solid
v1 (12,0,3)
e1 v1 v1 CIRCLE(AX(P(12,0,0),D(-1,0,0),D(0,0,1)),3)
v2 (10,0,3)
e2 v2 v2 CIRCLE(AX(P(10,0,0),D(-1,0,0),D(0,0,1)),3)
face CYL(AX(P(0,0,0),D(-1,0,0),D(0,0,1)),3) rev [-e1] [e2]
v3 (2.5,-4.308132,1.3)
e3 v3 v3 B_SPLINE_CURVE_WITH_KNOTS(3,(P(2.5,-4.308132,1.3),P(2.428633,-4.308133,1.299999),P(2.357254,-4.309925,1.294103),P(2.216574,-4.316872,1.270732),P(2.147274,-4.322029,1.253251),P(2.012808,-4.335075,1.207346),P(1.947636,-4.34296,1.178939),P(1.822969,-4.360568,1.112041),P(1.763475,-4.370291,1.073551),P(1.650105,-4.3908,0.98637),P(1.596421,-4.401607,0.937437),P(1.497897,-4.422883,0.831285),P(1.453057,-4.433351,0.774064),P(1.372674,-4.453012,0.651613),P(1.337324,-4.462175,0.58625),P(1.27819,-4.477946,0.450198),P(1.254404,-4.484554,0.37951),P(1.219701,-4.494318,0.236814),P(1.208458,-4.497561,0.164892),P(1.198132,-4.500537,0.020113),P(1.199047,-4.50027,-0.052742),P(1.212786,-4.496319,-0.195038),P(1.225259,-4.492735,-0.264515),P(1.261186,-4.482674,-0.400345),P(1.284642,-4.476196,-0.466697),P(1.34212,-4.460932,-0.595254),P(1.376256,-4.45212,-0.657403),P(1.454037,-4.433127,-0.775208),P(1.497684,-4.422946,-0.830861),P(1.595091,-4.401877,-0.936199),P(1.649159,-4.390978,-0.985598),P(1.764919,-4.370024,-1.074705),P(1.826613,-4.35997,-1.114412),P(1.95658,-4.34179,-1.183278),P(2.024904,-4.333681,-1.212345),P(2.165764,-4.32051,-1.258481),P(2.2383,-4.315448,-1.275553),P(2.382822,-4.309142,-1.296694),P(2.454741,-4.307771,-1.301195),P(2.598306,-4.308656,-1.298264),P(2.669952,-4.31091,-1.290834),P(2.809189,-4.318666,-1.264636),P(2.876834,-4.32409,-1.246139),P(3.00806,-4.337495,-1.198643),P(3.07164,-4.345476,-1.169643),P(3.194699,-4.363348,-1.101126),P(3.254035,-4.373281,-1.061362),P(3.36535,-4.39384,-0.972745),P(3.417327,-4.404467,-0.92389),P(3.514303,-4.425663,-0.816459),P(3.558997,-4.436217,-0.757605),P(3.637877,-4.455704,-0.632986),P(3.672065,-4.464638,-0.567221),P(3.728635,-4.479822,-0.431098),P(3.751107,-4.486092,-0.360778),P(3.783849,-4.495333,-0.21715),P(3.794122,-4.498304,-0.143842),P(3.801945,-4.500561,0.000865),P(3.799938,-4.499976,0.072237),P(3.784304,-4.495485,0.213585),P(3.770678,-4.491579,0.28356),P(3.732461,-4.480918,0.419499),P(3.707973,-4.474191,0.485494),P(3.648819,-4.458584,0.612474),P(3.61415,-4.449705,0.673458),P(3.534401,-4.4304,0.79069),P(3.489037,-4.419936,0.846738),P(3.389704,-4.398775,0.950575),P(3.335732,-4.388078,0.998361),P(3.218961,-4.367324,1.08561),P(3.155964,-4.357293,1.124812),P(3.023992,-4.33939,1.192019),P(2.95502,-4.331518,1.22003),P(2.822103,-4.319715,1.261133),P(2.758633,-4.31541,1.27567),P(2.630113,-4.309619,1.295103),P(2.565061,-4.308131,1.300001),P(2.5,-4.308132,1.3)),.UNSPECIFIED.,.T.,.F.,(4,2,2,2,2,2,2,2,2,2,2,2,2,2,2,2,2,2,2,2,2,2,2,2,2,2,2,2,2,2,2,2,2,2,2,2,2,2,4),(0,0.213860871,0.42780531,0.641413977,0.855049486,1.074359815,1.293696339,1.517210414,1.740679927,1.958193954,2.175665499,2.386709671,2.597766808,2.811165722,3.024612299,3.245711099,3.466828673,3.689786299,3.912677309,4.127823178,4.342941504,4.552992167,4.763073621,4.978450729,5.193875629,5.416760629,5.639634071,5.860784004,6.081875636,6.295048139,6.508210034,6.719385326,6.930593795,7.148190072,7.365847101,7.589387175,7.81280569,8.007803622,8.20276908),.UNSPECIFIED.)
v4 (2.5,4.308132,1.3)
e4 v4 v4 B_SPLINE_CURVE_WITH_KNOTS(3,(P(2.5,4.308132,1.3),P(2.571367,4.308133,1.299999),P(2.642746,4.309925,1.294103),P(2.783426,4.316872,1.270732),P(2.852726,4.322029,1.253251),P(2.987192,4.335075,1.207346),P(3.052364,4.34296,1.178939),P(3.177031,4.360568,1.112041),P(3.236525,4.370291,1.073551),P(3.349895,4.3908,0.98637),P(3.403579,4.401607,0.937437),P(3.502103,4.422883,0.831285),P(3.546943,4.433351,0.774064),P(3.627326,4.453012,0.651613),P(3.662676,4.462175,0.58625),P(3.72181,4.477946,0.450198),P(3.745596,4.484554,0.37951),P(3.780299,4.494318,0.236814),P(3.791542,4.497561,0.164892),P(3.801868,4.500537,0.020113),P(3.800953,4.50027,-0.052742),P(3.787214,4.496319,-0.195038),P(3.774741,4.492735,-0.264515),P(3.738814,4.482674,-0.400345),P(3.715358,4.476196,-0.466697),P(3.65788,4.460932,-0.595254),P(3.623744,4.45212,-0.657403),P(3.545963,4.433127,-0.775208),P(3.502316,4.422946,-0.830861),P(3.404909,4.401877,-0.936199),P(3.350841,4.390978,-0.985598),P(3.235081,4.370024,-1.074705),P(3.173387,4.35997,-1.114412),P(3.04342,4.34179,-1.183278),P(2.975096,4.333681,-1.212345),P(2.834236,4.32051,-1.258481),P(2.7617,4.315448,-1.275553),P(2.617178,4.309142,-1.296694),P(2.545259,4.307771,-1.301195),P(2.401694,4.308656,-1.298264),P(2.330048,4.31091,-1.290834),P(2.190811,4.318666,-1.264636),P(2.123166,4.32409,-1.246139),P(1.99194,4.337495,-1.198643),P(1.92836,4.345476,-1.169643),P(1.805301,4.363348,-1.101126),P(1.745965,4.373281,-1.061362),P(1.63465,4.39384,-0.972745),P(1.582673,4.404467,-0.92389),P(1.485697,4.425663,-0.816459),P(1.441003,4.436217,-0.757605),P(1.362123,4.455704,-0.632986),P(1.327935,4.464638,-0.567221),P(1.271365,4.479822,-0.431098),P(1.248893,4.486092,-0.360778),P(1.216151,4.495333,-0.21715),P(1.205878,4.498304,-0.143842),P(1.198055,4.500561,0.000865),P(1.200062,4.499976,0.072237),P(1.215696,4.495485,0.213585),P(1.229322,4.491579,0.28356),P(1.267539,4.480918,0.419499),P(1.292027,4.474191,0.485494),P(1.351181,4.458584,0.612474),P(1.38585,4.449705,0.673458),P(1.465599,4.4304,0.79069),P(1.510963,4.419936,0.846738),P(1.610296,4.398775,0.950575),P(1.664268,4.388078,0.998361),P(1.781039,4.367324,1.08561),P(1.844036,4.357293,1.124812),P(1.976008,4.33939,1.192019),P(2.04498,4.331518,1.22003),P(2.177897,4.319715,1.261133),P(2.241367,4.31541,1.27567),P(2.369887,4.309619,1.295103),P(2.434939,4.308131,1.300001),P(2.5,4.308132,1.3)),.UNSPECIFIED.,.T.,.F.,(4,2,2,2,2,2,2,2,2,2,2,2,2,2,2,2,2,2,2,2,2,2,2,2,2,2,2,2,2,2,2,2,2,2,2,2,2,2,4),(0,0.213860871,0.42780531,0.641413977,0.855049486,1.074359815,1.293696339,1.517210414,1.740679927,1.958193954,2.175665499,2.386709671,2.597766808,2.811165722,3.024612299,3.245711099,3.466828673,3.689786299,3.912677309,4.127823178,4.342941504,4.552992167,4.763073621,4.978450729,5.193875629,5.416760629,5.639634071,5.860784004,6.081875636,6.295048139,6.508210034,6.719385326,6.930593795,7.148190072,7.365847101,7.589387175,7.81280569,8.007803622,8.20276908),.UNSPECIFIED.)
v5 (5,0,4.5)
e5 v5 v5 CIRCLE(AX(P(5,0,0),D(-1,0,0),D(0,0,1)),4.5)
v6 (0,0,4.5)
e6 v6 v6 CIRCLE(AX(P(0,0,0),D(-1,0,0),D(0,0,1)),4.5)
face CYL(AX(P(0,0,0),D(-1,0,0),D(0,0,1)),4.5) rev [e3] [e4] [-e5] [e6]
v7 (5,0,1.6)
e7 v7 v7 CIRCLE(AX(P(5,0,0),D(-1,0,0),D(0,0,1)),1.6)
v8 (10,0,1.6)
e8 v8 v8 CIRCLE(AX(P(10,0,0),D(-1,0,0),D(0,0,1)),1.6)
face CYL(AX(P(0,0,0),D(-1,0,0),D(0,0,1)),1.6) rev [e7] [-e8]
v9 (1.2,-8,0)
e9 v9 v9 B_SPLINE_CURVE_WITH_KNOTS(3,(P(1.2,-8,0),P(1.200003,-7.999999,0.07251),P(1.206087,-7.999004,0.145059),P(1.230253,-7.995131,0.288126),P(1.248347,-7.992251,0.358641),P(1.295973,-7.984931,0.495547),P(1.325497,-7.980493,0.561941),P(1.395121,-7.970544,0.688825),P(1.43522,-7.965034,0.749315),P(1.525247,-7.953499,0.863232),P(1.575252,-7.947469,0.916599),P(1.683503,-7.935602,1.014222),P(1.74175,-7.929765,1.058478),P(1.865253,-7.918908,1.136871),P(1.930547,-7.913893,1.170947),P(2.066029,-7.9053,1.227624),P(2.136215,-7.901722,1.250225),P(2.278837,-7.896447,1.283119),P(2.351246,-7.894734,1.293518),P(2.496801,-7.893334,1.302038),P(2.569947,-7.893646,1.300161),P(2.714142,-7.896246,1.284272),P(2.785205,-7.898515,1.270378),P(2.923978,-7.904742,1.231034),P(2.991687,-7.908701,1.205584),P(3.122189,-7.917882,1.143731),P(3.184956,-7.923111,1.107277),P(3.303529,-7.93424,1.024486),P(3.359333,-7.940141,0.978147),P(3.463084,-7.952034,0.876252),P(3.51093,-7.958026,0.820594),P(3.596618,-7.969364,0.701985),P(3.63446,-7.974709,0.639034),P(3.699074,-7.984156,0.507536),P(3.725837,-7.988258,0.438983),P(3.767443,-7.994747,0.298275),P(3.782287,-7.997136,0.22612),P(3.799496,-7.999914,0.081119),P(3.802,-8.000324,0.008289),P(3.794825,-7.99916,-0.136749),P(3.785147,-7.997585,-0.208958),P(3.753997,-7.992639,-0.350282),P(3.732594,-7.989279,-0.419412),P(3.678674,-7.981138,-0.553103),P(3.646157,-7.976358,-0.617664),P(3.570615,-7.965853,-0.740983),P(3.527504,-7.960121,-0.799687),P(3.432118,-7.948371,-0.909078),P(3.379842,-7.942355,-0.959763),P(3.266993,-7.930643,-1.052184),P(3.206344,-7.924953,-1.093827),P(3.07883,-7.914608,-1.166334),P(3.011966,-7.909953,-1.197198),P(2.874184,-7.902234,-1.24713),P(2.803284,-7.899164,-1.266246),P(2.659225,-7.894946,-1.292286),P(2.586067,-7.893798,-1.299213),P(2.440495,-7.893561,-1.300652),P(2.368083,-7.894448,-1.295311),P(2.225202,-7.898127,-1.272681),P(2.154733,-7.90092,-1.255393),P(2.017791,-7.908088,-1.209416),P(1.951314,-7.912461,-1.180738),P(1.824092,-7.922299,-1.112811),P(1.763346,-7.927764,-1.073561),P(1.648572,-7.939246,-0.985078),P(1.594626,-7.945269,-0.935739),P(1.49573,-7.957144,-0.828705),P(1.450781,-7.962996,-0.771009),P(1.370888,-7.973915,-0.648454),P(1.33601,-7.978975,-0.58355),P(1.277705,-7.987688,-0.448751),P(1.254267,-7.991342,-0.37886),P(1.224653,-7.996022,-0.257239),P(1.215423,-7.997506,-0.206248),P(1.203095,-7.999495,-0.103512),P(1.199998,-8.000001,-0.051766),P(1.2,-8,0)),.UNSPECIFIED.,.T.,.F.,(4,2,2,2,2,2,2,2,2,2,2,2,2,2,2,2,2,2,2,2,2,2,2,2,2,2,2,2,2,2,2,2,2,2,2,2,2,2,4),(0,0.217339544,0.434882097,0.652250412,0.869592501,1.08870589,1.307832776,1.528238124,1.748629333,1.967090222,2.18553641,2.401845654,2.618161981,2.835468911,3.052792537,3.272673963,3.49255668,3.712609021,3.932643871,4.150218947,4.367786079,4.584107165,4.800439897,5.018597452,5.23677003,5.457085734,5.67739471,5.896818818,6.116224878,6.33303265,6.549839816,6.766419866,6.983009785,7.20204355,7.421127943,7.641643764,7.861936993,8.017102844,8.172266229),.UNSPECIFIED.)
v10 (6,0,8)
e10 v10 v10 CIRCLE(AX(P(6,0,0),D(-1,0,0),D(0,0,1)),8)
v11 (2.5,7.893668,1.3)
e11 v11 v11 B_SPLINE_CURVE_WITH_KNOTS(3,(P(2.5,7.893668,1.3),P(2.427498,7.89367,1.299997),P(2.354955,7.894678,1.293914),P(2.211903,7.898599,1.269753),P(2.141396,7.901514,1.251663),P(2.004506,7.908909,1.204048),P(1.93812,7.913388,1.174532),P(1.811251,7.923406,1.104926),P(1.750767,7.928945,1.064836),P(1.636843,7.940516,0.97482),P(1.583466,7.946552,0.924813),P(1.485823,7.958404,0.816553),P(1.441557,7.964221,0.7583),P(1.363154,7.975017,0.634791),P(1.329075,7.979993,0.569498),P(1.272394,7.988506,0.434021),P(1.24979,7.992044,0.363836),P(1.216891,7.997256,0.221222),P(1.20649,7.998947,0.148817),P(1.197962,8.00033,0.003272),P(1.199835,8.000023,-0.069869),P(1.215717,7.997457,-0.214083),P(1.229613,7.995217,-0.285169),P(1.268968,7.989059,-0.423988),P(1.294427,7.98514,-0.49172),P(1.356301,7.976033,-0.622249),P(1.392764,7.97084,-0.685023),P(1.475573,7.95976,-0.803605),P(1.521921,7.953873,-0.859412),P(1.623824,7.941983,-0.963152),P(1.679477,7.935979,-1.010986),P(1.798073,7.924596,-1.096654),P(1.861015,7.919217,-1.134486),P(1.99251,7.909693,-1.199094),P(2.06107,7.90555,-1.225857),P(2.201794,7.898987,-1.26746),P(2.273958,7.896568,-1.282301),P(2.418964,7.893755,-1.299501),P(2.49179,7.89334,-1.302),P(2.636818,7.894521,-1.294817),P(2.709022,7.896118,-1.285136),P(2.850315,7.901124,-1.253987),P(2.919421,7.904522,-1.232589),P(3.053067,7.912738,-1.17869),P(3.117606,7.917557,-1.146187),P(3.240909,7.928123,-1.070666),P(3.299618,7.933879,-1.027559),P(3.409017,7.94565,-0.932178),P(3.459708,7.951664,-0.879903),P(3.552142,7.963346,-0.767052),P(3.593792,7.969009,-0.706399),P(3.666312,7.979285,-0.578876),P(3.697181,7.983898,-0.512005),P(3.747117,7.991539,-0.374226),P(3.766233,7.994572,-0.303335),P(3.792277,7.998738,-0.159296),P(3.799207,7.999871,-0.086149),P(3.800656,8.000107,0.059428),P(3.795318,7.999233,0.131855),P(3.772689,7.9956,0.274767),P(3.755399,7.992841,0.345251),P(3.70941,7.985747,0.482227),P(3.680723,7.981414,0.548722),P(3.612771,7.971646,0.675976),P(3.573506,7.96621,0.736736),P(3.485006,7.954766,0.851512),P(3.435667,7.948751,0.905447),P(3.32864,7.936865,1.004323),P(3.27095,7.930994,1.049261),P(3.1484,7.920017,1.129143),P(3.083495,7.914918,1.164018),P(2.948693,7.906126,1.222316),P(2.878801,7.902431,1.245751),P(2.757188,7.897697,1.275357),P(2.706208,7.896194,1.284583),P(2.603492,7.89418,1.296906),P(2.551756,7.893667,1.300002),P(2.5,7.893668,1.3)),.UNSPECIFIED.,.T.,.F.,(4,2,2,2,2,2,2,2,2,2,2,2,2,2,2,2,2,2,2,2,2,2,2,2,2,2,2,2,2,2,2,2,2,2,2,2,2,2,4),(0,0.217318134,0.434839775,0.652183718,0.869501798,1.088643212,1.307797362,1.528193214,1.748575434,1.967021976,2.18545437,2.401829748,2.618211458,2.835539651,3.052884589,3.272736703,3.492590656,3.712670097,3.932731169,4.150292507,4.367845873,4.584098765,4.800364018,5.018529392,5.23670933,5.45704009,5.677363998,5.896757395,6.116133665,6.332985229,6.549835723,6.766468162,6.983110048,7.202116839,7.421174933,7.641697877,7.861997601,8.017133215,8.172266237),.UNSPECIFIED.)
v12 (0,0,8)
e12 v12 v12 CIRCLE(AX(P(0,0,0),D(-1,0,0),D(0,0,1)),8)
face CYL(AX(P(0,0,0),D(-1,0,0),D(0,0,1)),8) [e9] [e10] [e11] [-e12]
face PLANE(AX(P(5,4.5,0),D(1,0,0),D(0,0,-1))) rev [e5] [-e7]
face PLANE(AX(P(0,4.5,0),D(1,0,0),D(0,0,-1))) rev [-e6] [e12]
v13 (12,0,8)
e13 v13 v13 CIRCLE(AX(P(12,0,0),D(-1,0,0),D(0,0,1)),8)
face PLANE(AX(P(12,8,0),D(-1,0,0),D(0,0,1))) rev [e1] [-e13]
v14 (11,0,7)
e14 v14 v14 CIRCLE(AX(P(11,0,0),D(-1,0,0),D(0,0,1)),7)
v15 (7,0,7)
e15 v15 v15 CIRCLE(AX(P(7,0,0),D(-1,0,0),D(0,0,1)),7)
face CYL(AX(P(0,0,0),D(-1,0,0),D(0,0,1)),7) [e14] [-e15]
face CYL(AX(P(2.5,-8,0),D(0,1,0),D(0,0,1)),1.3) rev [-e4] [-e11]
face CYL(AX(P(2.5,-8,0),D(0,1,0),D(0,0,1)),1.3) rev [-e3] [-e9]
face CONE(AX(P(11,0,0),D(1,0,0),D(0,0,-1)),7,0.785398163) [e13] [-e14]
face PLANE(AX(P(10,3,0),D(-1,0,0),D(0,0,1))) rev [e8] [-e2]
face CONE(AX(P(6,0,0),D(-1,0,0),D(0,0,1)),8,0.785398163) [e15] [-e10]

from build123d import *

# Parameters (mm, degrees)
CUT_EXTRUDE1_DEPTH      = 17.492422502
CUT_EXTRUDE1_DEPTH_BACK = 17.492422502
SKETCH2_R               = 1.3
CHAMFER1_SIZE           = 1


with BuildPart() as part:
    # Sketch1 → Revolve1 (revolve)
    with BuildSketch(Plane.XY, mode=Mode.PRIVATE) as revolve1_sk:
        Polygon((0, 4.5), (0, 8), (7, 8), (7, 7), (11, 7), (11, 8), (12, 8), (12, 3), (10, 3), (10, 1.6), (5, 1.6), (5, 4.5), align=None)
    revolve(revolve1_sk.sketch.rotate(Axis((0, 0, 0), (1, 0, 0)), 90), axis=Axis((0, 0, 0), (1, 0, 0)))

    # Sketch2 → Cut-Extrude1 (cut, two sides: drawn at the far end of the back side and taken through both)
    with BuildSketch(Plane(origin=(0, 0, 0), x_dir=(1, 0, 0), z_dir=(0, 1, 0)).offset(-CUT_EXTRUDE1_DEPTH_BACK)):
        with Locations(Location((2.5, 0, 0), (0, 0, 270))):
            Circle(SKETCH2_R)
    extrude(amount=CUT_EXTRUDE1_DEPTH + CUT_EXTRUDE1_DEPTH_BACK, mode=Mode.SUBTRACT)

    # Chamfer1
    chamfer1_edges = [part.edges().sort_by_distance(p)[0] for p in [
        (11, 0, -8),
        (7, 0, -8),
    ]]
    chamfer(chamfer1_edges, length=CHAMFER1_SIZE - 0.0001)  # a hair under: the kernel refuses the full size


solid = part.part
